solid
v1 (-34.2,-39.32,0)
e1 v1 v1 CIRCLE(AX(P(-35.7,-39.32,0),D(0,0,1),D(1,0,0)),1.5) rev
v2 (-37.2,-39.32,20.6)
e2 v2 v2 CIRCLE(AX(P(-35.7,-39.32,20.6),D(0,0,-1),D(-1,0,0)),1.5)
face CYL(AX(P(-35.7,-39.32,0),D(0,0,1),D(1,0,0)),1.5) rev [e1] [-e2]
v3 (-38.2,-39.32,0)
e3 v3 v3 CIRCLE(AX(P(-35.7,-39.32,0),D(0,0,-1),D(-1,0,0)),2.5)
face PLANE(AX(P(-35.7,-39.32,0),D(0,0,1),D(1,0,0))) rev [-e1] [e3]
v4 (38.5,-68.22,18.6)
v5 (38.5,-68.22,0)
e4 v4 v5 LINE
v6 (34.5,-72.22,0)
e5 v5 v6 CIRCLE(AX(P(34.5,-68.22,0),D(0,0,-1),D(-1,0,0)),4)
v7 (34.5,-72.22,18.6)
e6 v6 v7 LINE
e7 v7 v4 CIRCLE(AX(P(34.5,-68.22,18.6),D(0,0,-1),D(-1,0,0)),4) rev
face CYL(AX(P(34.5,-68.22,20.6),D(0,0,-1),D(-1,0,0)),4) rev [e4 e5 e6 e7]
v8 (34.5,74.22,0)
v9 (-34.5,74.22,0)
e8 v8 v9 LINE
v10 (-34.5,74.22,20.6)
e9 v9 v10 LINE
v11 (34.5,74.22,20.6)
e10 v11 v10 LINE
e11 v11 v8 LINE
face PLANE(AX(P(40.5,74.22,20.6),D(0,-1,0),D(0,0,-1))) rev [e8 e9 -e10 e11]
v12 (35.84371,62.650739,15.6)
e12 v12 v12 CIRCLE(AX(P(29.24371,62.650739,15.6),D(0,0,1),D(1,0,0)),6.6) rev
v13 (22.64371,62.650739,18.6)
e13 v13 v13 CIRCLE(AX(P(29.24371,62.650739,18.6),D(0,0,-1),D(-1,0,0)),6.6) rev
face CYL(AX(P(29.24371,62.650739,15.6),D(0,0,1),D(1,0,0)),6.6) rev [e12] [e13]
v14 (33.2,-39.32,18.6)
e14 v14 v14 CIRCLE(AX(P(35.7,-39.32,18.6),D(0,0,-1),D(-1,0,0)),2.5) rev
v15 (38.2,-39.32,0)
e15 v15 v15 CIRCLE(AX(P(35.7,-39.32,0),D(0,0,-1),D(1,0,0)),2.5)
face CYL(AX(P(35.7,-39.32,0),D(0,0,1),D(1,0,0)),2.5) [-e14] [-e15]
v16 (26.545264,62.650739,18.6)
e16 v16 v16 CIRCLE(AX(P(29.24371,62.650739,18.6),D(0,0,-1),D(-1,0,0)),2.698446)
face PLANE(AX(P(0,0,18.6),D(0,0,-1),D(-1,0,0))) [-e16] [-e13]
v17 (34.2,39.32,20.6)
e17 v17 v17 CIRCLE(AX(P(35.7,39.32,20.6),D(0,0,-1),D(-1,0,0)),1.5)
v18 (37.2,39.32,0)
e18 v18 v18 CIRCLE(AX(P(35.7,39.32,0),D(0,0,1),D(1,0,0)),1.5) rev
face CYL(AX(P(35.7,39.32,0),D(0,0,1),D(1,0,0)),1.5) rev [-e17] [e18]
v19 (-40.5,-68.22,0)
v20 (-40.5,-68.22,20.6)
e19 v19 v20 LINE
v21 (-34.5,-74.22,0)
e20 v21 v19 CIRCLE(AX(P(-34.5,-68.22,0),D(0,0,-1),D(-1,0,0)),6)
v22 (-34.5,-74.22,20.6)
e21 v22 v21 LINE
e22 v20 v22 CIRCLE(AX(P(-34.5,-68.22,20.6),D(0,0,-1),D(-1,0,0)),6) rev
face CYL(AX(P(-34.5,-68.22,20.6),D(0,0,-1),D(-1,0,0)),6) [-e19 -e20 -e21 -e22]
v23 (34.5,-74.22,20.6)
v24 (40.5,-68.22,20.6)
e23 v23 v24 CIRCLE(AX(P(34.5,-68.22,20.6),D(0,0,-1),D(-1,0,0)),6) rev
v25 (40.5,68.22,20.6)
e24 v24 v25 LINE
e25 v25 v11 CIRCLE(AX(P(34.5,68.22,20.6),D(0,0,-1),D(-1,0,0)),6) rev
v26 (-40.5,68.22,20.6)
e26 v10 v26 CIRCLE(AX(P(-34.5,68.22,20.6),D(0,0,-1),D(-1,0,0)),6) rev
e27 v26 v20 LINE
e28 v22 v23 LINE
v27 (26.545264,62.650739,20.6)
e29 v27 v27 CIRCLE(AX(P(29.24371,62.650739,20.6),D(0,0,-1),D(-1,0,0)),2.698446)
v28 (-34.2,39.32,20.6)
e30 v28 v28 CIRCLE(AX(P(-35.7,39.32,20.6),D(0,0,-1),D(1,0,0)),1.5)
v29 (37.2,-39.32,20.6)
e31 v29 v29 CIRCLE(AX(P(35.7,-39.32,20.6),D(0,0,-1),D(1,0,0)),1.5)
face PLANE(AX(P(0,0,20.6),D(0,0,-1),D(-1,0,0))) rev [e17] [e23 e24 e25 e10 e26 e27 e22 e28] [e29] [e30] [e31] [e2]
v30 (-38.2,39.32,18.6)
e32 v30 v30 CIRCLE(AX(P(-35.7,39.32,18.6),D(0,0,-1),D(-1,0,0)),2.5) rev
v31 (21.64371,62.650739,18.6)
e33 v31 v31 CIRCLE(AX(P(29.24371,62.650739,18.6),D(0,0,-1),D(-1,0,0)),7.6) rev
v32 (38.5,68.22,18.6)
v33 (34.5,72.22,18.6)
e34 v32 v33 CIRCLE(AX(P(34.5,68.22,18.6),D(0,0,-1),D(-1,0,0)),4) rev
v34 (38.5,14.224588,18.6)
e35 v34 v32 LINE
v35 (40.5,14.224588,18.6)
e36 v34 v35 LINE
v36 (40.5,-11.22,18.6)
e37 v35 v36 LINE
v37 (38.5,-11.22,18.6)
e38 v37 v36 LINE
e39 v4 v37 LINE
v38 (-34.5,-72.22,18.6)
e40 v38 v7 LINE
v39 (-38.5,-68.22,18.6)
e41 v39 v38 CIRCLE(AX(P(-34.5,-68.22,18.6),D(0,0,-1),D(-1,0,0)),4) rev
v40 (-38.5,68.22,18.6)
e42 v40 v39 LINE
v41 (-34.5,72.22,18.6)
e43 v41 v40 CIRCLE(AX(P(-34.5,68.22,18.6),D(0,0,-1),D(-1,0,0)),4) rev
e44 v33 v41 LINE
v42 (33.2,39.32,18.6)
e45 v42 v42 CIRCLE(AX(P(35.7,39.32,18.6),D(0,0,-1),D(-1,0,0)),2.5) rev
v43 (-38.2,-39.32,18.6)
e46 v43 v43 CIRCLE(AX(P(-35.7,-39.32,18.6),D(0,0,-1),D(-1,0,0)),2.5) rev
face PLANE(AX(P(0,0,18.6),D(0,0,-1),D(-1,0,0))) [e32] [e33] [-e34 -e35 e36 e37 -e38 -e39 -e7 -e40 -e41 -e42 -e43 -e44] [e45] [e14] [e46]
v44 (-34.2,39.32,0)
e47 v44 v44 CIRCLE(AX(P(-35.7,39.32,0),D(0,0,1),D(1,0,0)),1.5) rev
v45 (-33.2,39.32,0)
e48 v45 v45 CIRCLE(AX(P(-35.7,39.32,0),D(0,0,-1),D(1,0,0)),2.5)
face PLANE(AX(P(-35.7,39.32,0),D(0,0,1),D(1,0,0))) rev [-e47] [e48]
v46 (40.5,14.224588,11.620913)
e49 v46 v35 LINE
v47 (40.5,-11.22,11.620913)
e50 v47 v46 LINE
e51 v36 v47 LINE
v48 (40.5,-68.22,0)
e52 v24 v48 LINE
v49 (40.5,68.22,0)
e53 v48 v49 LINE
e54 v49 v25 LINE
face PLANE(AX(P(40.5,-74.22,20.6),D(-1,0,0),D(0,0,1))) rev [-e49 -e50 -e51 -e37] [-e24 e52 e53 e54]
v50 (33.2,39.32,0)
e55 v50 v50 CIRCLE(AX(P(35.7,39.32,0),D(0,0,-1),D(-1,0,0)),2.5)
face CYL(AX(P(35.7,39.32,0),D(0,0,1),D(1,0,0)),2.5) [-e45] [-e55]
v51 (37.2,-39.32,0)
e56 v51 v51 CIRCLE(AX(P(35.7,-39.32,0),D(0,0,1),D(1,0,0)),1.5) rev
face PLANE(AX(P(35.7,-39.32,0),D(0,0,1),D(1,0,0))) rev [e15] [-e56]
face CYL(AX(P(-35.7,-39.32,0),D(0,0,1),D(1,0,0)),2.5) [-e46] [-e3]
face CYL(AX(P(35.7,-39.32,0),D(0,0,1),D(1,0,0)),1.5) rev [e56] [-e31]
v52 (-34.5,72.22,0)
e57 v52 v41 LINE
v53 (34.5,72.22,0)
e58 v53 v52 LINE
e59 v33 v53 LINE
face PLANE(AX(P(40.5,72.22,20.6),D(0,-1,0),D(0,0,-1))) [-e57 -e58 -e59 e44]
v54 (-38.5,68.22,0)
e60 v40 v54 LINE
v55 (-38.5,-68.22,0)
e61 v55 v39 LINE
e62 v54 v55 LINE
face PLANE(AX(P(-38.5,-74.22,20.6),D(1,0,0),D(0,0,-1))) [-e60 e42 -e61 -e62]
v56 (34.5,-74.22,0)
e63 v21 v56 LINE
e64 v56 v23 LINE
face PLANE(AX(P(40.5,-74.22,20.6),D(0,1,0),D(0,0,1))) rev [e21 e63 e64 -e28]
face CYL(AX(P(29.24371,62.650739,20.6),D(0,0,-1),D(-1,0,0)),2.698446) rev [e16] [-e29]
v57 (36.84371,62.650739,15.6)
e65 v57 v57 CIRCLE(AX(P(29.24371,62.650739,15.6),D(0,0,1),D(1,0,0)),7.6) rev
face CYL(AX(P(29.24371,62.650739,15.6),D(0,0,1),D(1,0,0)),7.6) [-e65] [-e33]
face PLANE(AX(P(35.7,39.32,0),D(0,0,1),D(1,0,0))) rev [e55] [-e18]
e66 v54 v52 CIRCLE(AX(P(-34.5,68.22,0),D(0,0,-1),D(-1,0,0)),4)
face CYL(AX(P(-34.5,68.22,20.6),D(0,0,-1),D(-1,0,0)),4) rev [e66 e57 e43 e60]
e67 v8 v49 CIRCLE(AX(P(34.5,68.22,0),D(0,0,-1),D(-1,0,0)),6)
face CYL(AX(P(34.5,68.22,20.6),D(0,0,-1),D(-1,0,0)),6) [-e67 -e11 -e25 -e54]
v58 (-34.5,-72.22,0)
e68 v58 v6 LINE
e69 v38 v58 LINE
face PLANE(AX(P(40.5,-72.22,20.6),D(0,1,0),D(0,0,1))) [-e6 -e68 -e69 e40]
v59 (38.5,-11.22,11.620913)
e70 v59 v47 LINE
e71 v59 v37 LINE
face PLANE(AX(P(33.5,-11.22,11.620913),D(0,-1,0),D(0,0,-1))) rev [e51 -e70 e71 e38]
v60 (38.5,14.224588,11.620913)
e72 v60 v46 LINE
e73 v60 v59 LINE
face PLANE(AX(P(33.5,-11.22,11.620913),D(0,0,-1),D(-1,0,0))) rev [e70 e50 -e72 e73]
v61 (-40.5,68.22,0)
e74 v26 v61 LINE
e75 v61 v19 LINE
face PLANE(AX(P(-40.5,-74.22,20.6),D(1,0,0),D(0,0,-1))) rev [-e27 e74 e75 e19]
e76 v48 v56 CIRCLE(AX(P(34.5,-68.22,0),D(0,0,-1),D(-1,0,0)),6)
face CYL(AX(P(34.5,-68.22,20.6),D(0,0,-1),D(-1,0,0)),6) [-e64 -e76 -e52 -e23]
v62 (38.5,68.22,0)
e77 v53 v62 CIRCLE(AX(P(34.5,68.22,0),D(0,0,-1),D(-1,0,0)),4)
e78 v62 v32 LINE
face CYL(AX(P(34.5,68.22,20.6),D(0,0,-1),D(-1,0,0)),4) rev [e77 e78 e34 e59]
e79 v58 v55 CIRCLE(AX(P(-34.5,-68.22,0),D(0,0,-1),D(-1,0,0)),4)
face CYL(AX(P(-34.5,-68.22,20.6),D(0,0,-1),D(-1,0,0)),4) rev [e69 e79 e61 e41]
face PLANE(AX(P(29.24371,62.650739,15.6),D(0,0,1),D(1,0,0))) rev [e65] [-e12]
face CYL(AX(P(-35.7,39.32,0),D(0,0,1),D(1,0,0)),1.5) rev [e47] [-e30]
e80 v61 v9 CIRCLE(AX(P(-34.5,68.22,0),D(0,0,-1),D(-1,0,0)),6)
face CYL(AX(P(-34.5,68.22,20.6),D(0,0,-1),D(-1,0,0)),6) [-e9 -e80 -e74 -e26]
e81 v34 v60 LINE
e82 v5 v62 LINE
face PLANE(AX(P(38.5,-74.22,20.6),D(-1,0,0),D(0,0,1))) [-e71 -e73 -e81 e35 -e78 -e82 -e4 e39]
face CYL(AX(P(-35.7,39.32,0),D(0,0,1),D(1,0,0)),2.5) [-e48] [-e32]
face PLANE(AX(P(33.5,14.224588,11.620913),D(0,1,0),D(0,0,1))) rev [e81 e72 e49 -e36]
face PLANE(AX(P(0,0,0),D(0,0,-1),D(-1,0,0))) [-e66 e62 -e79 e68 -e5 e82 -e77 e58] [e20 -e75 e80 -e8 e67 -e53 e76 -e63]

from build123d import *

# Parameters (mm, degrees)
SKIZZE2_W                       = 148.44
SKIZZE2_H                       = 81
AUFSATZ_LINEAR_AUSTRAGEN1_DEPTH = 20.6
VERRUNDUNG2_R                   = 6
WANDUNG2_T                      = -2
VERST_RKUNGSRIPPE11_START       = -18.6
VERST_RKUNGSRIPPE11_OUTLINE_R   = 2.5
VERST_RKUNGSRIPPE11_OUTLINE_R_2 = 1.5
VERST_RKUNGSRIPPE11_DEPTH       = 18.6
VERST_RKUNGSRIPPE17_START       = -3
VERST_RKUNGSRIPPE17_OUTLINE_R   = 7.6
VERST_RKUNGSRIPPE17_OUTLINE_R_2 = 6.6
VERST_RKUNGSRIPPE17_DEPTH       = 3
SKIZZE31_R                      = 2.698446287
SCHNITT_LINEAR_AUSTRAGEN4_DEPTH = 87.572619228
SKIZZE32_R                      = 1.5
SCHNITT_LINEAR_AUSTRAGEN5_DEPTH = 87.572619228
SKIZZE33_W                      = 25.444588161
SKIZZE33_H                      = 6.979087038
SCHNITT_LINEAR_AUSTRAGEN6_DEPTH = 7


# Read off the part's stored shape, not the designer's step: Verstärkungsrippe11, Verstärkungsrippe17
with BuildPart() as part:
    # Skizze2 → Aufsatz-Linear austragen1 (new body)
    with BuildSketch(Plane(origin=(0, 0, 0), x_dir=(0, 1, 0), z_dir=(0, 0, 1))):
        Rectangle(SKIZZE2_W, SKIZZE2_H)
    extrude(amount=AUFSATZ_LINEAR_AUSTRAGEN1_DEPTH)

    # Verrundung2
    verrundung2_edges = [part.edges().sort_by_distance(p)[0] for p in [
        (40.5, 74.22, 10.3),
        (40.5, -74.22, 10.3),
        (-40.5, -74.22, 10.3),
        (-40.5, 74.22, 10.3),
    ]]
    fillet(verrundung2_edges, radius=VERRUNDUNG2_R)

    # Wandung2
    wandung2_openings = [part.faces().sort_by_distance(p)[0] for p in [
        (0, 0, 0),
    ]]
    offset(amount=WANDUNG2_T, openings=wandung2_openings, kind=Kind.INTERSECTION)

    # Verstärkungsrippe11 outline → Verstärkungsrippe11 (add)
    # profile 1 of 4: a face of its own
    with BuildSketch(Plane(origin=(0, 0, 0), x_dir=(1, 0, 0), z_dir=(0, 0, -1)).offset(VERST_RKUNGSRIPPE11_START)):
        with Locations((-35.7, 39.32)):
            Circle(VERST_RKUNGSRIPPE11_OUTLINE_R)
        with Locations((-35.7, 39.32)):
            Circle(VERST_RKUNGSRIPPE11_OUTLINE_R_2, mode=Mode.SUBTRACT)
    # profile 2 of 4: a face of its own
    with BuildSketch(Plane(origin=(0, 0, 0), x_dir=(1, 0, 0), z_dir=(0, 0, -1)).offset(VERST_RKUNGSRIPPE11_START)):
        with Locations((35.7, 39.32)):
            Circle(VERST_RKUNGSRIPPE11_OUTLINE_R)
        with Locations((35.7, 39.32)):
            Circle(VERST_RKUNGSRIPPE11_OUTLINE_R_2, mode=Mode.SUBTRACT)
    # profile 3 of 4: a face of its own
    with BuildSketch(Plane(origin=(0, 0, 0), x_dir=(1, 0, 0), z_dir=(0, 0, -1)).offset(VERST_RKUNGSRIPPE11_START)):
        with Locations((35.7, -39.32)):
            Circle(VERST_RKUNGSRIPPE11_OUTLINE_R)
        with Locations((35.7, -39.32)):
            Circle(VERST_RKUNGSRIPPE11_OUTLINE_R_2, mode=Mode.SUBTRACT)
    # profile 4 of 4: a face of its own
    with BuildSketch(Plane(origin=(0, 0, 0), x_dir=(1, 0, 0), z_dir=(0, 0, -1)).offset(VERST_RKUNGSRIPPE11_START)):
        with Locations((-35.7, -39.32)):
            Circle(VERST_RKUNGSRIPPE11_OUTLINE_R)
        with Locations((-35.7, -39.32)):
            Circle(VERST_RKUNGSRIPPE11_OUTLINE_R_2, mode=Mode.SUBTRACT)
    extrude(amount=VERST_RKUNGSRIPPE11_DEPTH)

    # Verstärkungsrippe17 outline → Verstärkungsrippe17 (add)
    with BuildSketch(Plane.YX.offset(-15.6).offset(VERST_RKUNGSRIPPE17_START)):
        with Locations((62.650739245, 29.243709866)):
            Circle(VERST_RKUNGSRIPPE17_OUTLINE_R)
        with Locations((62.650739245, 29.243709866)):
            Circle(VERST_RKUNGSRIPPE17_OUTLINE_R_2, mode=Mode.SUBTRACT)
    extrude(amount=VERST_RKUNGSRIPPE17_DEPTH)

    # Skizze31 → Schnitt-Linear austragen4 (cut, through all)
    with BuildSketch(Plane(origin=(0, 0, 18.6), x_dir=(1, 0, 0), z_dir=(0, 0, -1))):
        with Locations(Location((29.243709866, -62.650739245, 0), (0, 0, 180))):
            Circle(SKIZZE31_R)
    extrude(amount=-SCHNITT_LINEAR_AUSTRAGEN4_DEPTH, mode=Mode.SUBTRACT)

    # Skizze32 → Schnitt-Linear austragen5 (cut, through all)
    with BuildSketch(Plane(origin=(0, 0, 18.6), x_dir=(1, 0, 0), z_dir=(0, 0, -1))):
        with Locations((-35.7, 39.32)):
            Circle(SKIZZE32_R)
        with Locations((35.7, 39.32)):
            Circle(SKIZZE32_R)
        with Locations((35.7, -39.32)):
            Circle(SKIZZE32_R)
        with Locations((-35.7, -39.32)):
            Circle(SKIZZE32_R)
    extrude(amount=-SCHNITT_LINEAR_AUSTRAGEN5_DEPTH, mode=Mode.SUBTRACT)

    # Skizze33 → Schnitt-Linear austragen6 (cut)
    with BuildSketch(Plane.YZ.offset(40.5)):
        with Locations((1.502294081, 15.110456481)):
            Rectangle(SKIZZE33_W, SKIZZE33_H)
    extrude(amount=-SCHNITT_LINEAR_AUSTRAGEN6_DEPTH, mode=Mode.SUBTRACT)


solid = part.part
